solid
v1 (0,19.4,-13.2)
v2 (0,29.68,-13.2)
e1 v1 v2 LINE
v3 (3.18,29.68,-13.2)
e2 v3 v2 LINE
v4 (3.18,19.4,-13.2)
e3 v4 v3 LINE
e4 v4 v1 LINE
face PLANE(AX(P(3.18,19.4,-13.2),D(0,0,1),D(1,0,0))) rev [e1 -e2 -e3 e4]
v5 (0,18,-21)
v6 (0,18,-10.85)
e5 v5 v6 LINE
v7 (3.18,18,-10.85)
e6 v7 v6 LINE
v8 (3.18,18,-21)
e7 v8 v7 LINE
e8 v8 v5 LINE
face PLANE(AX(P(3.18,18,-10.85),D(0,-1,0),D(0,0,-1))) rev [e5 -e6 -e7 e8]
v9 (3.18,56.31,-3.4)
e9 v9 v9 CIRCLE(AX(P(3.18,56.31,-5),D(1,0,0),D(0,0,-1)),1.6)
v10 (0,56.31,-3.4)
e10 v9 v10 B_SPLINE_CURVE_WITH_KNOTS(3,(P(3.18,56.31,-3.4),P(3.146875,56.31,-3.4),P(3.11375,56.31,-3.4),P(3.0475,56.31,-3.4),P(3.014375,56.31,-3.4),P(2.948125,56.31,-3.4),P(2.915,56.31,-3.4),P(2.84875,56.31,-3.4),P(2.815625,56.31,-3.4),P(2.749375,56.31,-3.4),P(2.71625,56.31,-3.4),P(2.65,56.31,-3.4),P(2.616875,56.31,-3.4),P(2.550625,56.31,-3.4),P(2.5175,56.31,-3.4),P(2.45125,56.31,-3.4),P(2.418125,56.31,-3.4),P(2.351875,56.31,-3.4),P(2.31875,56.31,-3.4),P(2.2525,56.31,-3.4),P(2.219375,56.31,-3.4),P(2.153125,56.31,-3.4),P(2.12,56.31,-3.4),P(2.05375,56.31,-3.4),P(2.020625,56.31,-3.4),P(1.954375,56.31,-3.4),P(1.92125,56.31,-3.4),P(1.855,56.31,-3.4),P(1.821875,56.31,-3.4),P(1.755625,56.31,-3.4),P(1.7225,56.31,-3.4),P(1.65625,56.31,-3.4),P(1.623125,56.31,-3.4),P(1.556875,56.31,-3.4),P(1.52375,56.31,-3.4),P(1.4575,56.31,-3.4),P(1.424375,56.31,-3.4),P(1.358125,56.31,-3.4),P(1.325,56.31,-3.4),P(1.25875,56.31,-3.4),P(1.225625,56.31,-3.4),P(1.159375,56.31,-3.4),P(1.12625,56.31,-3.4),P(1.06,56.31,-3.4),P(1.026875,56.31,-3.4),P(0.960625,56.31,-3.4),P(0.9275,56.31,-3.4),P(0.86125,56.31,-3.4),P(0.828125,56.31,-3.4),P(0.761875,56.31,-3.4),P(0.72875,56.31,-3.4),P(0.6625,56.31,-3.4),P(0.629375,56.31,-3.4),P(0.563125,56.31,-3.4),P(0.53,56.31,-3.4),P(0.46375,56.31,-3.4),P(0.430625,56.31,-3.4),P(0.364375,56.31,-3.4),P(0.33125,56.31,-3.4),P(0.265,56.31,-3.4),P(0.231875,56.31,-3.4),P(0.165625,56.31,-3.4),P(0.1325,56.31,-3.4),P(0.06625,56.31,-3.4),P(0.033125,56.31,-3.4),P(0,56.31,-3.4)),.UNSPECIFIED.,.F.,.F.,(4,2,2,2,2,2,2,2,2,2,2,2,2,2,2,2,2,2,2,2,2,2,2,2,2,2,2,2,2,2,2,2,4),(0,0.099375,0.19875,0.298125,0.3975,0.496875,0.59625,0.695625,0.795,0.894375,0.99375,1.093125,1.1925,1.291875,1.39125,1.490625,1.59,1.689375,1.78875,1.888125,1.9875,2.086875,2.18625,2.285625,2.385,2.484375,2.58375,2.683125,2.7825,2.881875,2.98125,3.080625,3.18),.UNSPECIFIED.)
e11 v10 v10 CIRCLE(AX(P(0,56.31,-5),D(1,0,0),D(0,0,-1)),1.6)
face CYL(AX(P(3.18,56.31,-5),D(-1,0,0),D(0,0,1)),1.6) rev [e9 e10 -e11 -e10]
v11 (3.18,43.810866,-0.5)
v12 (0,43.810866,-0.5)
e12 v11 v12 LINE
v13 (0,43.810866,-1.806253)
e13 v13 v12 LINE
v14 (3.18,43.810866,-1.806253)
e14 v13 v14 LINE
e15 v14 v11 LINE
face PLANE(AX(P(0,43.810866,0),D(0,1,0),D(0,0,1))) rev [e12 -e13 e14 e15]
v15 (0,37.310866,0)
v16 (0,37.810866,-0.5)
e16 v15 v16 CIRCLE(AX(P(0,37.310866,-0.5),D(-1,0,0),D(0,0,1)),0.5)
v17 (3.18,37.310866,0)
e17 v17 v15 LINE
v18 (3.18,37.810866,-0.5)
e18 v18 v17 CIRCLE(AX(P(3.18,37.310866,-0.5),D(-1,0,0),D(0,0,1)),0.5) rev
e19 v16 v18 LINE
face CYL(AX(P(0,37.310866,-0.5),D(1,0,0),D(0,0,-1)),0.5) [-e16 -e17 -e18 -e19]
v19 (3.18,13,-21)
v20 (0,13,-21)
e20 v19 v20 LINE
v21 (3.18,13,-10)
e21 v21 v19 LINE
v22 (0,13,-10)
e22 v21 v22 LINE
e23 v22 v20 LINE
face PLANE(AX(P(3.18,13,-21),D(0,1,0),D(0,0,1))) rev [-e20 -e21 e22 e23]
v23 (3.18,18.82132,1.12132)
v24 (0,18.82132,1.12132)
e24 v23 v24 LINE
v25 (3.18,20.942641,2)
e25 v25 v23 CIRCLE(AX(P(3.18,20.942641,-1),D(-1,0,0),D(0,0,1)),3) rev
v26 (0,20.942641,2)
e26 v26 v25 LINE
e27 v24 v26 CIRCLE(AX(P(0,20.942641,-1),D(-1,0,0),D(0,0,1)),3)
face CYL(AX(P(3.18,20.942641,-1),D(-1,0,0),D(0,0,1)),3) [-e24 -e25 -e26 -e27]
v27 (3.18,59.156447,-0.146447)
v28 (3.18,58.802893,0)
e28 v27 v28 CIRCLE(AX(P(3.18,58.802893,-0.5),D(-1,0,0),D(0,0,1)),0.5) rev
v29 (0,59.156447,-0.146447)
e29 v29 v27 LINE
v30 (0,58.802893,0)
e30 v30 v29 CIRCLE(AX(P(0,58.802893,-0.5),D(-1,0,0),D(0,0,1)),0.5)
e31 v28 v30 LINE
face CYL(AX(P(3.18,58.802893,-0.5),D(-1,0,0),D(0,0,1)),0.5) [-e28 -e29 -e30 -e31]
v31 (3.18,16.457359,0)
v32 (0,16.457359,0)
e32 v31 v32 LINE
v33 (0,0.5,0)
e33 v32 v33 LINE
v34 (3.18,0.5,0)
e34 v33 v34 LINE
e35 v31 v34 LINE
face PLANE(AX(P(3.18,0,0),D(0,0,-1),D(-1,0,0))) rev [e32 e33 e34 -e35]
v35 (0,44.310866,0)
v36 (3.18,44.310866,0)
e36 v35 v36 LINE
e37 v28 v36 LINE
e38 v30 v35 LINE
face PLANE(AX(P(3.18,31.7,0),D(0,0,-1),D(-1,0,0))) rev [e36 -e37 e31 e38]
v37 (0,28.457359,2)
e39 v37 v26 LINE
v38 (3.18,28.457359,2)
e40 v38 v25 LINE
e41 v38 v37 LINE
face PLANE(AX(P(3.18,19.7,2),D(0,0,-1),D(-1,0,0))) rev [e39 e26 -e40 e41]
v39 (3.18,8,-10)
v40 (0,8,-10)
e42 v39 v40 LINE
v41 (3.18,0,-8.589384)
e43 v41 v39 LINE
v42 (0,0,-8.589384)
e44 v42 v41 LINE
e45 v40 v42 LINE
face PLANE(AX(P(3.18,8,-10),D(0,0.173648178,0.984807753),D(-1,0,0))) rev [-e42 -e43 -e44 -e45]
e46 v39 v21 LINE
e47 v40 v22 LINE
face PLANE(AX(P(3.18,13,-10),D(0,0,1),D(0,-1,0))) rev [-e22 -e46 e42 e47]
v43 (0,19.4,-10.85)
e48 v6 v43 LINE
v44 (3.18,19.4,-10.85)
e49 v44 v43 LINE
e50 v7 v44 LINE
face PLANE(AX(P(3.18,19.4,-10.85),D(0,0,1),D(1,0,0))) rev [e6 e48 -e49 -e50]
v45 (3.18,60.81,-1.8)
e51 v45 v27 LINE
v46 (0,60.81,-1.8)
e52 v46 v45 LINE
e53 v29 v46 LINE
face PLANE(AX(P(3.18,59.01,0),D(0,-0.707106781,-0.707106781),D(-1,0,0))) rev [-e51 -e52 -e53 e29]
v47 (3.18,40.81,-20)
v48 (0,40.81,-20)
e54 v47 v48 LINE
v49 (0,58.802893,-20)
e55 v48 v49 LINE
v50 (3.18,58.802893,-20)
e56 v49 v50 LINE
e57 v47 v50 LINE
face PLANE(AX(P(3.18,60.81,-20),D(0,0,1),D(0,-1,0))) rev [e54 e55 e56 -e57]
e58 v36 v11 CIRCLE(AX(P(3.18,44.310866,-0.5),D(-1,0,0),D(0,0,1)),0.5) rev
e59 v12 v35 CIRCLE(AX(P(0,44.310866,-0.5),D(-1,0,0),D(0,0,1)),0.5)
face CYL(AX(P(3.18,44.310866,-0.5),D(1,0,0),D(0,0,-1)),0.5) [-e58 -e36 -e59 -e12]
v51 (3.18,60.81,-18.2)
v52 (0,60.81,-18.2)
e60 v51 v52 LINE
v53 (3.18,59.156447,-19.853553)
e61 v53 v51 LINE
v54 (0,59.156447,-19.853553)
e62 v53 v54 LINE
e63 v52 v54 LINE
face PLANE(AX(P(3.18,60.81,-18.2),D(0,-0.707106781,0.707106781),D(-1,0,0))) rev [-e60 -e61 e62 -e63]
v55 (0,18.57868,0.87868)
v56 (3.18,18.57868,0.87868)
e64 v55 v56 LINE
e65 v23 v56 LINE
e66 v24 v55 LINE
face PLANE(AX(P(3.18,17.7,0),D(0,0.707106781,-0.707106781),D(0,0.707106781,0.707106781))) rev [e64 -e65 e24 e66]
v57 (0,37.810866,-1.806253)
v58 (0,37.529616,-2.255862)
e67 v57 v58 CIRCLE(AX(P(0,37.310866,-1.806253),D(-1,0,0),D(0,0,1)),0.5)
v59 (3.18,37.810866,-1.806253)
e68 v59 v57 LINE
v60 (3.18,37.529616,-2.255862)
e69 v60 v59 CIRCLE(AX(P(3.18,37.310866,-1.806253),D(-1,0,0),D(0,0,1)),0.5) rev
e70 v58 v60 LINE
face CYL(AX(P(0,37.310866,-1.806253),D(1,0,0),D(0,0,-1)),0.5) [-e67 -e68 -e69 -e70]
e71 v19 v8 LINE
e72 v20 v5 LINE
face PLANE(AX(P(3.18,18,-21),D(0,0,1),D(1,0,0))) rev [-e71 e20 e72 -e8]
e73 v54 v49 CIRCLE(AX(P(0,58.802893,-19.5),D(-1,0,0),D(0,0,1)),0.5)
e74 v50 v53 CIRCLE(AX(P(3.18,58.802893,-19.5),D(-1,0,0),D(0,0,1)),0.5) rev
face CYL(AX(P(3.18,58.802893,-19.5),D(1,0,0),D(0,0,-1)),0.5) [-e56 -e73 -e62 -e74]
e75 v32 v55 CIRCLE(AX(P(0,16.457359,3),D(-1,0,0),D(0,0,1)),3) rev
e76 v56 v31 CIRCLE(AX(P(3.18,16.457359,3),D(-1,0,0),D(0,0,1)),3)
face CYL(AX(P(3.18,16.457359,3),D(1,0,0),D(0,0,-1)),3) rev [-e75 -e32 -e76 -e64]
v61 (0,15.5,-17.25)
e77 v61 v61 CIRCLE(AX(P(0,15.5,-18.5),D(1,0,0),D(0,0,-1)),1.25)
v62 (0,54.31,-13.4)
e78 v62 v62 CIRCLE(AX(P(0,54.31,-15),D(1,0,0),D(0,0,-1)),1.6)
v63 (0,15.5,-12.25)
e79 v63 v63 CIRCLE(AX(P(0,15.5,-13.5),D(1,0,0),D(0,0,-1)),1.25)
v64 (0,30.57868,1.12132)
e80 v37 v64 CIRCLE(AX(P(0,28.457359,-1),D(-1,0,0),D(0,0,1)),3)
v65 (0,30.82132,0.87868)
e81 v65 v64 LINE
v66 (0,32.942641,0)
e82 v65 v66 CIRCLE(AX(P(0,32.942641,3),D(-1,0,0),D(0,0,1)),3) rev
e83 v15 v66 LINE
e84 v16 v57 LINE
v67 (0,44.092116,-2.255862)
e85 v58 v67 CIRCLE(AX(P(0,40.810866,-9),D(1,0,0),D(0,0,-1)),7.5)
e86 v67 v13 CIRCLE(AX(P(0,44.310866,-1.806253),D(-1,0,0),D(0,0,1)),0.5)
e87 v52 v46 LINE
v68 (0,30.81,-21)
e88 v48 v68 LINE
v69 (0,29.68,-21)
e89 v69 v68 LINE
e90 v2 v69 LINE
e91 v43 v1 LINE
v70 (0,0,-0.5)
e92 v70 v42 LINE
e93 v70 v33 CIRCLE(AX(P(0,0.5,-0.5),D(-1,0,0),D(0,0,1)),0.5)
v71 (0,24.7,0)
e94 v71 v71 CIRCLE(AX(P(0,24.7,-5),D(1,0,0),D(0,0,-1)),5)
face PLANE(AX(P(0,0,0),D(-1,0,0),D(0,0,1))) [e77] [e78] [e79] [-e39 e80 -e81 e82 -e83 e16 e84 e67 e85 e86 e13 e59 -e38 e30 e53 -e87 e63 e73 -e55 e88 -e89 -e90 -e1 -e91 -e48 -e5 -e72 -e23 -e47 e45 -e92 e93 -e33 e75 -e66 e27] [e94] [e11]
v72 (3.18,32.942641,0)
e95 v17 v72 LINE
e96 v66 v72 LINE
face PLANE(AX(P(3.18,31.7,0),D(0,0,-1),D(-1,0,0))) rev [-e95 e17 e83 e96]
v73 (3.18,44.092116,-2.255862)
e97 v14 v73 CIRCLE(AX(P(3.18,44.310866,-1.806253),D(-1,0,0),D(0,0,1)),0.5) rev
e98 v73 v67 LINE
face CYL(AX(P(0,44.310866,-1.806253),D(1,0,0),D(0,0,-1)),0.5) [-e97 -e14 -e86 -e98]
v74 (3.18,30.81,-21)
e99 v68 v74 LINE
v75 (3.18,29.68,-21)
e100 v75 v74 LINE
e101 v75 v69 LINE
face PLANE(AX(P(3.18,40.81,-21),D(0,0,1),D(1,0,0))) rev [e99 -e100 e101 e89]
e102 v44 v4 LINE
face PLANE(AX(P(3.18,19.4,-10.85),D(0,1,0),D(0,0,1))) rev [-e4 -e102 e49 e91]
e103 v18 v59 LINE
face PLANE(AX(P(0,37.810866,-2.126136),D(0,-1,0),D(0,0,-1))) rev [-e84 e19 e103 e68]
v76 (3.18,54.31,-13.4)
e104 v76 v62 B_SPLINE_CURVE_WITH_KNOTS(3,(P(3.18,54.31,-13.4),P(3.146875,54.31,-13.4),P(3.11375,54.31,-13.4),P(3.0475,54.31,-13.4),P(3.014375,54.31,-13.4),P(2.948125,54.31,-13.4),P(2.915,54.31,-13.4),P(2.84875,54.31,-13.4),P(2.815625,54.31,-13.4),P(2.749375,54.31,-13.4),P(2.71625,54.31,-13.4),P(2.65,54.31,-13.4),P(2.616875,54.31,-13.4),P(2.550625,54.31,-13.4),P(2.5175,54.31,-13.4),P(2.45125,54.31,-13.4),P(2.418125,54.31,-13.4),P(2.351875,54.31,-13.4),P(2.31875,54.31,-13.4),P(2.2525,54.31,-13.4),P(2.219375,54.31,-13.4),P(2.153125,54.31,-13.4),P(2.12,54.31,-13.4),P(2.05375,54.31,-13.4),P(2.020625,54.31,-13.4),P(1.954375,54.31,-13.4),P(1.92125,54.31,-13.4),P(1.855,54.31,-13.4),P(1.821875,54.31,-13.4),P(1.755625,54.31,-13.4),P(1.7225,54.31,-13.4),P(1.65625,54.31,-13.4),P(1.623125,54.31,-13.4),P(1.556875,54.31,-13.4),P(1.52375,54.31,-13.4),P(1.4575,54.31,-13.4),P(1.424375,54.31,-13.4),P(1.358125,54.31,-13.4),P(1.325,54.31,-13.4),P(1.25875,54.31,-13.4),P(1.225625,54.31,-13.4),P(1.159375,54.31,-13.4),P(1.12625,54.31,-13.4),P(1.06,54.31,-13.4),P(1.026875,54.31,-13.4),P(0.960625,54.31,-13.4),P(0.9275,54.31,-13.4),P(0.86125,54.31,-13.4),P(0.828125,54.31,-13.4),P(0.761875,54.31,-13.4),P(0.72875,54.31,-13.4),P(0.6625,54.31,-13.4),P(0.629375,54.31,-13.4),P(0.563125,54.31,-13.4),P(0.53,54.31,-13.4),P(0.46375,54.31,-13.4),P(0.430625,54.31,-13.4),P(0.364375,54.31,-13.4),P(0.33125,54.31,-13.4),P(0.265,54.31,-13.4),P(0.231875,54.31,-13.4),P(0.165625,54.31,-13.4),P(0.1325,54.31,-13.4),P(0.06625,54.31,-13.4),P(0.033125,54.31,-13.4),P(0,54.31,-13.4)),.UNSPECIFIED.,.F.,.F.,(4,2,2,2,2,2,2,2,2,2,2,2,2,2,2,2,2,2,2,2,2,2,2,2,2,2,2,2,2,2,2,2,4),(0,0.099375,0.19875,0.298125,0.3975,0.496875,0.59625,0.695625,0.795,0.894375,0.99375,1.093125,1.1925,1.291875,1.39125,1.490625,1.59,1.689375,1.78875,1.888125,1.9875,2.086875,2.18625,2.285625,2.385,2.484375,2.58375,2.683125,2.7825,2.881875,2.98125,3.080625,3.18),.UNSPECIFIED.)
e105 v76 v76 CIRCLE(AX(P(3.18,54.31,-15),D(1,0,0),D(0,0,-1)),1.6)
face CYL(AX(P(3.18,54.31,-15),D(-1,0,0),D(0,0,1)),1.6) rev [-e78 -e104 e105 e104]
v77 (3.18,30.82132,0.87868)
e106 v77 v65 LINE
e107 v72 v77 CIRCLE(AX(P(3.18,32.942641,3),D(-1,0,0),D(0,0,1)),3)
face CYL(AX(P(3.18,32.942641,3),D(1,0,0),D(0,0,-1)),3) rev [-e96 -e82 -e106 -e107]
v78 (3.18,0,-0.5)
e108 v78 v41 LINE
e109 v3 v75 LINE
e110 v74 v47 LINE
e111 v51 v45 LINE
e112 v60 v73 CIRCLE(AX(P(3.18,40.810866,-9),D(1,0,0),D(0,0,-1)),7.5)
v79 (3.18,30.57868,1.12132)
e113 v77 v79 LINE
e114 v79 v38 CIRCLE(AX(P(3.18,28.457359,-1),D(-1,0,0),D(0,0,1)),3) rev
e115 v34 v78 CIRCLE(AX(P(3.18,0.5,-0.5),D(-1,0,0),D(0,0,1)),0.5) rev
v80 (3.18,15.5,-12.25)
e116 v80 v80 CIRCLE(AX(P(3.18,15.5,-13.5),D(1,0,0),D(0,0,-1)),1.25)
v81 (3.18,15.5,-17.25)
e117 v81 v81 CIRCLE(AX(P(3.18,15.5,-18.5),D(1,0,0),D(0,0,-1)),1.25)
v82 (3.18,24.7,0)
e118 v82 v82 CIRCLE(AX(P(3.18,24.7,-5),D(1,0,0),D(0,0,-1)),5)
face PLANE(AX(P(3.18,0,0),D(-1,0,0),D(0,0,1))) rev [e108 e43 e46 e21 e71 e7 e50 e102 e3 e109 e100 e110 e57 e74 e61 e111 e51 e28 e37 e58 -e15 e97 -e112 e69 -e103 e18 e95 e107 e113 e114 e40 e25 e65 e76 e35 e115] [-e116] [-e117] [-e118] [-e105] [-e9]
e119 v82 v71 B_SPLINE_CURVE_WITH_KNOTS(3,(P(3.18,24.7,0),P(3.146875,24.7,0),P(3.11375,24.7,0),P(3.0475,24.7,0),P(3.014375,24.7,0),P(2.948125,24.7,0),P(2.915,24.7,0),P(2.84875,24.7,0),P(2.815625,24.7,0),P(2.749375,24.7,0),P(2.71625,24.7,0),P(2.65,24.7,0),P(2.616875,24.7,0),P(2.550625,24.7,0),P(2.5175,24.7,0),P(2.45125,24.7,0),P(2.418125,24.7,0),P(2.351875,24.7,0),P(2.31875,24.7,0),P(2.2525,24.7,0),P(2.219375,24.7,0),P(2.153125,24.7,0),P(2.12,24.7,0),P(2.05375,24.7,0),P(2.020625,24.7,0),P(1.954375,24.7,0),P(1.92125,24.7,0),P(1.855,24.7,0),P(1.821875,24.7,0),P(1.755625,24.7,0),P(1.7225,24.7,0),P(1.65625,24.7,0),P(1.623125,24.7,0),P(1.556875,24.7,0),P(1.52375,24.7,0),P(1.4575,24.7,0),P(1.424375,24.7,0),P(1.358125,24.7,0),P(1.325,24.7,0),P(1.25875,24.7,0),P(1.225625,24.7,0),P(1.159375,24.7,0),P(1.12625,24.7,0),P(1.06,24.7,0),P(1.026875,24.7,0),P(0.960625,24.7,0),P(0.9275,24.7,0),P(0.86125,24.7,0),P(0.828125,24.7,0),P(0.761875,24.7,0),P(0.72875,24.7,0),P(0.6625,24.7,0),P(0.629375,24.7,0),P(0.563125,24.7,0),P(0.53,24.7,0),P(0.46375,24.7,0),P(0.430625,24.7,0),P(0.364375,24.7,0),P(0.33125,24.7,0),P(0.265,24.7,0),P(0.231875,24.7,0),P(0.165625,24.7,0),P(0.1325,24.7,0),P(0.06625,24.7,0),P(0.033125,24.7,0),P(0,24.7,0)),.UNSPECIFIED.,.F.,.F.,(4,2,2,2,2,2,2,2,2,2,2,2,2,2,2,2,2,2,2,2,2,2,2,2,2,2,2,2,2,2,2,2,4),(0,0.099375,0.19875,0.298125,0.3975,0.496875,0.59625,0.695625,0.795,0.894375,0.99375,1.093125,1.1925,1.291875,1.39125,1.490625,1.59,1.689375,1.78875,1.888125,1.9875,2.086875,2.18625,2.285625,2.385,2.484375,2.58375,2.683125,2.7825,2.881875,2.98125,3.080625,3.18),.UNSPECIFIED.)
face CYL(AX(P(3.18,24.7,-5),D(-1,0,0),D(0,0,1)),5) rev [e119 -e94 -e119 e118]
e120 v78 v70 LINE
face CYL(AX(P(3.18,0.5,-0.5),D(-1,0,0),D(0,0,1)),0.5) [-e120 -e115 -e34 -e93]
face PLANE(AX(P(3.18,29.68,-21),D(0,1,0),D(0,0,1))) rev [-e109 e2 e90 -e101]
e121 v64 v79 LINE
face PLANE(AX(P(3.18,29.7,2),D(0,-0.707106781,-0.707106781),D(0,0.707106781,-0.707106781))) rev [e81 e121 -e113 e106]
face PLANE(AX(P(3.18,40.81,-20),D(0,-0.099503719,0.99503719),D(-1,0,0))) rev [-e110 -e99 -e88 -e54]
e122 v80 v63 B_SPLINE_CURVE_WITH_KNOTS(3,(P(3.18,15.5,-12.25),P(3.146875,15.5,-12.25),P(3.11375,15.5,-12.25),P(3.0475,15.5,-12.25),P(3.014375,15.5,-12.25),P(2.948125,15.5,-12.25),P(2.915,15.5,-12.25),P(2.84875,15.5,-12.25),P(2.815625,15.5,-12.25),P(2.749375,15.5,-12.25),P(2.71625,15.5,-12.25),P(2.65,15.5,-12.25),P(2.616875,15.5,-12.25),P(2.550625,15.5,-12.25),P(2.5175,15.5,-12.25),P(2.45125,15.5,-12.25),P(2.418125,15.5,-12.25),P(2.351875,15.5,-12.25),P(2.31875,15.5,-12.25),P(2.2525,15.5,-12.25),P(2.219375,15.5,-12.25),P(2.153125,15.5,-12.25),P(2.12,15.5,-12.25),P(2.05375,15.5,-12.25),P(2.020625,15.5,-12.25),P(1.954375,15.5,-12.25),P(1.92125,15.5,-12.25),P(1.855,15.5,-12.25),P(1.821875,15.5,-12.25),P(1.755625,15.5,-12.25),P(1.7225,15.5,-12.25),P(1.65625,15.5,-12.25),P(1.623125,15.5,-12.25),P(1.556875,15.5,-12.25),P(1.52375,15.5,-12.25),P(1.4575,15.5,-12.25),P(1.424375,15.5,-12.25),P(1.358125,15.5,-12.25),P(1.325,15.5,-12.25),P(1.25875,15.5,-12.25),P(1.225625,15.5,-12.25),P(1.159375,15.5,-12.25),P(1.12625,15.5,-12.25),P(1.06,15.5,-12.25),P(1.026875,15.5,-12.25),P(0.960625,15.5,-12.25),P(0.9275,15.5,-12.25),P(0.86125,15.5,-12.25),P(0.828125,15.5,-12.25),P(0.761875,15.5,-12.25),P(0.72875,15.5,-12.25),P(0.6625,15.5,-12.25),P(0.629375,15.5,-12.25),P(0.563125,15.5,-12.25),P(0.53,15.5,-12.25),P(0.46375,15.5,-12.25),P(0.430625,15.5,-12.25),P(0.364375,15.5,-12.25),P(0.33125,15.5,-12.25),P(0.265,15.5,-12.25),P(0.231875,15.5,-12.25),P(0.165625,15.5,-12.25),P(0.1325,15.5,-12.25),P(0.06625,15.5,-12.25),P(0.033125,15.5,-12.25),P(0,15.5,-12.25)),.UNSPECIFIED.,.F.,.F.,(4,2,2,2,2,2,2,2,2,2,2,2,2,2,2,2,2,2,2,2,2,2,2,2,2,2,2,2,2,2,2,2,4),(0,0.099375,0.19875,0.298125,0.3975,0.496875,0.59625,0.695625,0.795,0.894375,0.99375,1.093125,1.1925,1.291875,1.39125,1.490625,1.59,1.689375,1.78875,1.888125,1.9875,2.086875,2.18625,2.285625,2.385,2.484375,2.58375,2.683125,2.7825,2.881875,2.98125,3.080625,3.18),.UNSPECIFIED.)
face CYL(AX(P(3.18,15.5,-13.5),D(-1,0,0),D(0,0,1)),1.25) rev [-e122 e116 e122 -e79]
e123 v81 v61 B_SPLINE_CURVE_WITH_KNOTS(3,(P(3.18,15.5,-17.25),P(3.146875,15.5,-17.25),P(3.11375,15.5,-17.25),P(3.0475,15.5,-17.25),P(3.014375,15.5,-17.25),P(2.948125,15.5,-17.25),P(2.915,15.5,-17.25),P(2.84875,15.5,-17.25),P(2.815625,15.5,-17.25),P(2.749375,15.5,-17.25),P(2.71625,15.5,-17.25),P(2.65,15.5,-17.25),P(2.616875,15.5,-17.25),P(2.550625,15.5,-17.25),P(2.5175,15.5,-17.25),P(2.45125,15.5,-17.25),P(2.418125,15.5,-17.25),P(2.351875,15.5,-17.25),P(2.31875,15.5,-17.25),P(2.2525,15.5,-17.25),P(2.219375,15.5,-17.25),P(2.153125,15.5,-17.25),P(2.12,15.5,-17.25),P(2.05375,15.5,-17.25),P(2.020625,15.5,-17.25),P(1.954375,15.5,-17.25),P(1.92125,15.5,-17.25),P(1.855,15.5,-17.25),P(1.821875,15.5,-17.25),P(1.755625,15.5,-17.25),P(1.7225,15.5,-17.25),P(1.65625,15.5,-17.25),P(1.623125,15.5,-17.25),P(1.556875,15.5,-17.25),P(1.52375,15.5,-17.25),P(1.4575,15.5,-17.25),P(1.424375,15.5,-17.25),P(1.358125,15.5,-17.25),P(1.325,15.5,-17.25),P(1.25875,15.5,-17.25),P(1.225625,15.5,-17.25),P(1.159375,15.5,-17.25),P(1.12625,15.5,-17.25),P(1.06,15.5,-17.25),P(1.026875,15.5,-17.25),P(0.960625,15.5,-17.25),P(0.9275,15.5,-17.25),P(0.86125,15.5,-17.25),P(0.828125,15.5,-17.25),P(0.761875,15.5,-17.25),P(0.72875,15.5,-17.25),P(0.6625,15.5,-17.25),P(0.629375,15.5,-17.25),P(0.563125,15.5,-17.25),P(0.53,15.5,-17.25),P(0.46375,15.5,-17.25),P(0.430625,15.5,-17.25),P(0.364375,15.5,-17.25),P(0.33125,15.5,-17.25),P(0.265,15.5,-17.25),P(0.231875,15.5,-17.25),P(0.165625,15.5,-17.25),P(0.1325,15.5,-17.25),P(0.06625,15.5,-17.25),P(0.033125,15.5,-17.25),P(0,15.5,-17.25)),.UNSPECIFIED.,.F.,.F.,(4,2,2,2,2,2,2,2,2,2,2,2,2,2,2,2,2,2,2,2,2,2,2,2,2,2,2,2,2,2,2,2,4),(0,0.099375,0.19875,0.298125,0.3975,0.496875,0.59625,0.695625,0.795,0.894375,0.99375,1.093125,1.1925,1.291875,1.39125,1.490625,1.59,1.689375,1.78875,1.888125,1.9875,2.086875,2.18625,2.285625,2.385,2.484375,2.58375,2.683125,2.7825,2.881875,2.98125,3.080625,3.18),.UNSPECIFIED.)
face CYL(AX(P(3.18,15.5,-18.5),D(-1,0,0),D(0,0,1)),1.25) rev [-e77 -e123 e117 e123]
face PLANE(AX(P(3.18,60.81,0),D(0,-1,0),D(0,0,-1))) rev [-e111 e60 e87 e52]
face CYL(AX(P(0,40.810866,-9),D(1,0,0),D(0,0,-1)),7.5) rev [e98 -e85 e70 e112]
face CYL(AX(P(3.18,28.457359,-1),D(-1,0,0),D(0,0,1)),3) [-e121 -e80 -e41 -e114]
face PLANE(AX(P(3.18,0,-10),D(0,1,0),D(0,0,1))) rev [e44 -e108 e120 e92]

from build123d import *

# Parameters (mm, degrees)
SKETCH1_R           = 5
SKETCH1_R_2         = 1.6
SKETCH1_R_3         = 1.25
BOSS_EXTRUDE1_DEPTH = 3.18
CHAMFER1_SIZE       = 8
CHAMFER1_SIZE2      = 1.410615846
CUT_EXTRUDE5_DEPTH  = 65.412487143
FILLET2_R           = 3
CHAMFER3_SIZE       = 1
CHAMFER3_SIZE_2     = 10
CHAMFER2_SIZE       = 1.8
FILLET4_R           = 0.5


with BuildPart() as part:
    # Sketch1 → Boss-Extrude1 (new body)
    with BuildSketch(Plane(origin=(0, 0, 0), x_dir=(0, 0, -1), z_dir=(1, 0, 0))):
        Polygon((0, 0), (0, 17.7), (-2, 19.7), (-2, 29.7), (0, 31.7), (0, 60.81), (20, 60.81), (20, 40.81), (21, 40.81), (21, 29.68), (13.2, 29.68), (13.2, 19.4), (10.85, 19.4), (10.85, 18), (21, 18), (21, 13), (10, 13), (10, 0), align=None)
        with Locations(Location((5, 24.7, 0), (0, 0, 180))):
            Circle(SKETCH1_R, mode=Mode.SUBTRACT)
        with Locations(Location((5, 56.31, 0), (0, 0, 180))):
            Circle(SKETCH1_R_2, mode=Mode.SUBTRACT)
        with Locations(Location((15, 54.31, 0), (0, 0, 180))):
            Circle(SKETCH1_R_2, mode=Mode.SUBTRACT)
        with Locations(Location((18.5, 15.5, 0), (0, 0, 180))):
            Circle(SKETCH1_R_3, mode=Mode.SUBTRACT)
        with Locations(Location((13.5, 15.5, 0), (0, 0, 180))):
            Circle(SKETCH1_R_3, mode=Mode.SUBTRACT)
    extrude(amount=BOSS_EXTRUDE1_DEPTH)

    # Chamfer1
    chamfer1_edges = [part.edges().sort_by_distance(p)[0] for p in [
        (1.59, 0, -10),
    ]]
    chamfer1_side = [part.faces().sort_by_distance(p)[0] for p in [
        (1.59, 6.5, -10),
    ]]
    chamfer(chamfer1_edges, length=CHAMFER1_SIZE, length2=CHAMFER1_SIZE2, reference=chamfer1_side[0])

    # Sketch8 → Cut-Extrude5 (cut, through all)
    with BuildSketch(Plane(origin=(3.18, 0, 0), x_dir=(0, 0, -1), z_dir=(1, 0, 0))):
        with BuildLine():
            Line((0, 43.810865899), (2.126136458, 43.810865899))
            ThreePointArc((2.126136458, 43.810865899), (16.5, 40.810865899), (2.126136458, 37.810865899))
            Line((2.126136458, 37.810865899), (0, 37.810865899))
            Line((0, 37.810865899), (0, 43.810865899))
        make_face()
    extrude(amount=-CUT_EXTRUDE5_DEPTH, mode=Mode.SUBTRACT)

    # Fillet2
    fillet2_edges = [part.edges().sort_by_distance(p)[0] for p in [
        (1.59, 17.7, 0),
        (1.59, 19.7, 2),
        (1.59, 29.7, 2),
        (1.59, 31.7, 0),
    ]]
    fillet(fillet2_edges, radius=FILLET2_R)

    # Chamfer3
    # the kernel refuses this chamfer: 10, 1 mm, written as the material it takes off along each edge
    with BuildSketch(Plane(origin=(-25.99522763, 40.81, -21), x_dir=(0, 0.3574851447578462, 0.9339188247794675), z_dir=(1, 0, 0))) as chamfer3_piece_1:
        Polygon((CHAMFER3_SIZE * 0.933918824779, CHAMFER3_SIZE * 0.357485144758), (-CHAMFER3_SIZE_2 * 0.357485144758, CHAMFER3_SIZE_2 * 0.933918824779), (0, 0), align=None)
    extrude(amount=55.170455259, mode=Mode.SUBTRACT)

    # Chamfer2
    chamfer2_edges = [part.edges().sort_by_distance(p)[0] for p in [
        (1.59, 60.81, 0),
        (1.59, 60.81, -20),
    ]]
    chamfer(chamfer2_edges, length=CHAMFER2_SIZE)

    # Fillet4
    fillet4_edges = [part.edges().sort_by_distance(p)[0] for p in [
        (1.59, 59.01, -20),
        (1.59, 59.01, 0),
        (1.59, 0, 0),
        (1.59, 37.810865899, 0),
        (1.59, 43.810865899, 0),
        (1.59, 43.810865899, -2.126136458),
        (1.59, 37.810865899, -2.126136458),
    ]]
    fillet(fillet4_edges, radius=FILLET4_R)


solid = part.part
